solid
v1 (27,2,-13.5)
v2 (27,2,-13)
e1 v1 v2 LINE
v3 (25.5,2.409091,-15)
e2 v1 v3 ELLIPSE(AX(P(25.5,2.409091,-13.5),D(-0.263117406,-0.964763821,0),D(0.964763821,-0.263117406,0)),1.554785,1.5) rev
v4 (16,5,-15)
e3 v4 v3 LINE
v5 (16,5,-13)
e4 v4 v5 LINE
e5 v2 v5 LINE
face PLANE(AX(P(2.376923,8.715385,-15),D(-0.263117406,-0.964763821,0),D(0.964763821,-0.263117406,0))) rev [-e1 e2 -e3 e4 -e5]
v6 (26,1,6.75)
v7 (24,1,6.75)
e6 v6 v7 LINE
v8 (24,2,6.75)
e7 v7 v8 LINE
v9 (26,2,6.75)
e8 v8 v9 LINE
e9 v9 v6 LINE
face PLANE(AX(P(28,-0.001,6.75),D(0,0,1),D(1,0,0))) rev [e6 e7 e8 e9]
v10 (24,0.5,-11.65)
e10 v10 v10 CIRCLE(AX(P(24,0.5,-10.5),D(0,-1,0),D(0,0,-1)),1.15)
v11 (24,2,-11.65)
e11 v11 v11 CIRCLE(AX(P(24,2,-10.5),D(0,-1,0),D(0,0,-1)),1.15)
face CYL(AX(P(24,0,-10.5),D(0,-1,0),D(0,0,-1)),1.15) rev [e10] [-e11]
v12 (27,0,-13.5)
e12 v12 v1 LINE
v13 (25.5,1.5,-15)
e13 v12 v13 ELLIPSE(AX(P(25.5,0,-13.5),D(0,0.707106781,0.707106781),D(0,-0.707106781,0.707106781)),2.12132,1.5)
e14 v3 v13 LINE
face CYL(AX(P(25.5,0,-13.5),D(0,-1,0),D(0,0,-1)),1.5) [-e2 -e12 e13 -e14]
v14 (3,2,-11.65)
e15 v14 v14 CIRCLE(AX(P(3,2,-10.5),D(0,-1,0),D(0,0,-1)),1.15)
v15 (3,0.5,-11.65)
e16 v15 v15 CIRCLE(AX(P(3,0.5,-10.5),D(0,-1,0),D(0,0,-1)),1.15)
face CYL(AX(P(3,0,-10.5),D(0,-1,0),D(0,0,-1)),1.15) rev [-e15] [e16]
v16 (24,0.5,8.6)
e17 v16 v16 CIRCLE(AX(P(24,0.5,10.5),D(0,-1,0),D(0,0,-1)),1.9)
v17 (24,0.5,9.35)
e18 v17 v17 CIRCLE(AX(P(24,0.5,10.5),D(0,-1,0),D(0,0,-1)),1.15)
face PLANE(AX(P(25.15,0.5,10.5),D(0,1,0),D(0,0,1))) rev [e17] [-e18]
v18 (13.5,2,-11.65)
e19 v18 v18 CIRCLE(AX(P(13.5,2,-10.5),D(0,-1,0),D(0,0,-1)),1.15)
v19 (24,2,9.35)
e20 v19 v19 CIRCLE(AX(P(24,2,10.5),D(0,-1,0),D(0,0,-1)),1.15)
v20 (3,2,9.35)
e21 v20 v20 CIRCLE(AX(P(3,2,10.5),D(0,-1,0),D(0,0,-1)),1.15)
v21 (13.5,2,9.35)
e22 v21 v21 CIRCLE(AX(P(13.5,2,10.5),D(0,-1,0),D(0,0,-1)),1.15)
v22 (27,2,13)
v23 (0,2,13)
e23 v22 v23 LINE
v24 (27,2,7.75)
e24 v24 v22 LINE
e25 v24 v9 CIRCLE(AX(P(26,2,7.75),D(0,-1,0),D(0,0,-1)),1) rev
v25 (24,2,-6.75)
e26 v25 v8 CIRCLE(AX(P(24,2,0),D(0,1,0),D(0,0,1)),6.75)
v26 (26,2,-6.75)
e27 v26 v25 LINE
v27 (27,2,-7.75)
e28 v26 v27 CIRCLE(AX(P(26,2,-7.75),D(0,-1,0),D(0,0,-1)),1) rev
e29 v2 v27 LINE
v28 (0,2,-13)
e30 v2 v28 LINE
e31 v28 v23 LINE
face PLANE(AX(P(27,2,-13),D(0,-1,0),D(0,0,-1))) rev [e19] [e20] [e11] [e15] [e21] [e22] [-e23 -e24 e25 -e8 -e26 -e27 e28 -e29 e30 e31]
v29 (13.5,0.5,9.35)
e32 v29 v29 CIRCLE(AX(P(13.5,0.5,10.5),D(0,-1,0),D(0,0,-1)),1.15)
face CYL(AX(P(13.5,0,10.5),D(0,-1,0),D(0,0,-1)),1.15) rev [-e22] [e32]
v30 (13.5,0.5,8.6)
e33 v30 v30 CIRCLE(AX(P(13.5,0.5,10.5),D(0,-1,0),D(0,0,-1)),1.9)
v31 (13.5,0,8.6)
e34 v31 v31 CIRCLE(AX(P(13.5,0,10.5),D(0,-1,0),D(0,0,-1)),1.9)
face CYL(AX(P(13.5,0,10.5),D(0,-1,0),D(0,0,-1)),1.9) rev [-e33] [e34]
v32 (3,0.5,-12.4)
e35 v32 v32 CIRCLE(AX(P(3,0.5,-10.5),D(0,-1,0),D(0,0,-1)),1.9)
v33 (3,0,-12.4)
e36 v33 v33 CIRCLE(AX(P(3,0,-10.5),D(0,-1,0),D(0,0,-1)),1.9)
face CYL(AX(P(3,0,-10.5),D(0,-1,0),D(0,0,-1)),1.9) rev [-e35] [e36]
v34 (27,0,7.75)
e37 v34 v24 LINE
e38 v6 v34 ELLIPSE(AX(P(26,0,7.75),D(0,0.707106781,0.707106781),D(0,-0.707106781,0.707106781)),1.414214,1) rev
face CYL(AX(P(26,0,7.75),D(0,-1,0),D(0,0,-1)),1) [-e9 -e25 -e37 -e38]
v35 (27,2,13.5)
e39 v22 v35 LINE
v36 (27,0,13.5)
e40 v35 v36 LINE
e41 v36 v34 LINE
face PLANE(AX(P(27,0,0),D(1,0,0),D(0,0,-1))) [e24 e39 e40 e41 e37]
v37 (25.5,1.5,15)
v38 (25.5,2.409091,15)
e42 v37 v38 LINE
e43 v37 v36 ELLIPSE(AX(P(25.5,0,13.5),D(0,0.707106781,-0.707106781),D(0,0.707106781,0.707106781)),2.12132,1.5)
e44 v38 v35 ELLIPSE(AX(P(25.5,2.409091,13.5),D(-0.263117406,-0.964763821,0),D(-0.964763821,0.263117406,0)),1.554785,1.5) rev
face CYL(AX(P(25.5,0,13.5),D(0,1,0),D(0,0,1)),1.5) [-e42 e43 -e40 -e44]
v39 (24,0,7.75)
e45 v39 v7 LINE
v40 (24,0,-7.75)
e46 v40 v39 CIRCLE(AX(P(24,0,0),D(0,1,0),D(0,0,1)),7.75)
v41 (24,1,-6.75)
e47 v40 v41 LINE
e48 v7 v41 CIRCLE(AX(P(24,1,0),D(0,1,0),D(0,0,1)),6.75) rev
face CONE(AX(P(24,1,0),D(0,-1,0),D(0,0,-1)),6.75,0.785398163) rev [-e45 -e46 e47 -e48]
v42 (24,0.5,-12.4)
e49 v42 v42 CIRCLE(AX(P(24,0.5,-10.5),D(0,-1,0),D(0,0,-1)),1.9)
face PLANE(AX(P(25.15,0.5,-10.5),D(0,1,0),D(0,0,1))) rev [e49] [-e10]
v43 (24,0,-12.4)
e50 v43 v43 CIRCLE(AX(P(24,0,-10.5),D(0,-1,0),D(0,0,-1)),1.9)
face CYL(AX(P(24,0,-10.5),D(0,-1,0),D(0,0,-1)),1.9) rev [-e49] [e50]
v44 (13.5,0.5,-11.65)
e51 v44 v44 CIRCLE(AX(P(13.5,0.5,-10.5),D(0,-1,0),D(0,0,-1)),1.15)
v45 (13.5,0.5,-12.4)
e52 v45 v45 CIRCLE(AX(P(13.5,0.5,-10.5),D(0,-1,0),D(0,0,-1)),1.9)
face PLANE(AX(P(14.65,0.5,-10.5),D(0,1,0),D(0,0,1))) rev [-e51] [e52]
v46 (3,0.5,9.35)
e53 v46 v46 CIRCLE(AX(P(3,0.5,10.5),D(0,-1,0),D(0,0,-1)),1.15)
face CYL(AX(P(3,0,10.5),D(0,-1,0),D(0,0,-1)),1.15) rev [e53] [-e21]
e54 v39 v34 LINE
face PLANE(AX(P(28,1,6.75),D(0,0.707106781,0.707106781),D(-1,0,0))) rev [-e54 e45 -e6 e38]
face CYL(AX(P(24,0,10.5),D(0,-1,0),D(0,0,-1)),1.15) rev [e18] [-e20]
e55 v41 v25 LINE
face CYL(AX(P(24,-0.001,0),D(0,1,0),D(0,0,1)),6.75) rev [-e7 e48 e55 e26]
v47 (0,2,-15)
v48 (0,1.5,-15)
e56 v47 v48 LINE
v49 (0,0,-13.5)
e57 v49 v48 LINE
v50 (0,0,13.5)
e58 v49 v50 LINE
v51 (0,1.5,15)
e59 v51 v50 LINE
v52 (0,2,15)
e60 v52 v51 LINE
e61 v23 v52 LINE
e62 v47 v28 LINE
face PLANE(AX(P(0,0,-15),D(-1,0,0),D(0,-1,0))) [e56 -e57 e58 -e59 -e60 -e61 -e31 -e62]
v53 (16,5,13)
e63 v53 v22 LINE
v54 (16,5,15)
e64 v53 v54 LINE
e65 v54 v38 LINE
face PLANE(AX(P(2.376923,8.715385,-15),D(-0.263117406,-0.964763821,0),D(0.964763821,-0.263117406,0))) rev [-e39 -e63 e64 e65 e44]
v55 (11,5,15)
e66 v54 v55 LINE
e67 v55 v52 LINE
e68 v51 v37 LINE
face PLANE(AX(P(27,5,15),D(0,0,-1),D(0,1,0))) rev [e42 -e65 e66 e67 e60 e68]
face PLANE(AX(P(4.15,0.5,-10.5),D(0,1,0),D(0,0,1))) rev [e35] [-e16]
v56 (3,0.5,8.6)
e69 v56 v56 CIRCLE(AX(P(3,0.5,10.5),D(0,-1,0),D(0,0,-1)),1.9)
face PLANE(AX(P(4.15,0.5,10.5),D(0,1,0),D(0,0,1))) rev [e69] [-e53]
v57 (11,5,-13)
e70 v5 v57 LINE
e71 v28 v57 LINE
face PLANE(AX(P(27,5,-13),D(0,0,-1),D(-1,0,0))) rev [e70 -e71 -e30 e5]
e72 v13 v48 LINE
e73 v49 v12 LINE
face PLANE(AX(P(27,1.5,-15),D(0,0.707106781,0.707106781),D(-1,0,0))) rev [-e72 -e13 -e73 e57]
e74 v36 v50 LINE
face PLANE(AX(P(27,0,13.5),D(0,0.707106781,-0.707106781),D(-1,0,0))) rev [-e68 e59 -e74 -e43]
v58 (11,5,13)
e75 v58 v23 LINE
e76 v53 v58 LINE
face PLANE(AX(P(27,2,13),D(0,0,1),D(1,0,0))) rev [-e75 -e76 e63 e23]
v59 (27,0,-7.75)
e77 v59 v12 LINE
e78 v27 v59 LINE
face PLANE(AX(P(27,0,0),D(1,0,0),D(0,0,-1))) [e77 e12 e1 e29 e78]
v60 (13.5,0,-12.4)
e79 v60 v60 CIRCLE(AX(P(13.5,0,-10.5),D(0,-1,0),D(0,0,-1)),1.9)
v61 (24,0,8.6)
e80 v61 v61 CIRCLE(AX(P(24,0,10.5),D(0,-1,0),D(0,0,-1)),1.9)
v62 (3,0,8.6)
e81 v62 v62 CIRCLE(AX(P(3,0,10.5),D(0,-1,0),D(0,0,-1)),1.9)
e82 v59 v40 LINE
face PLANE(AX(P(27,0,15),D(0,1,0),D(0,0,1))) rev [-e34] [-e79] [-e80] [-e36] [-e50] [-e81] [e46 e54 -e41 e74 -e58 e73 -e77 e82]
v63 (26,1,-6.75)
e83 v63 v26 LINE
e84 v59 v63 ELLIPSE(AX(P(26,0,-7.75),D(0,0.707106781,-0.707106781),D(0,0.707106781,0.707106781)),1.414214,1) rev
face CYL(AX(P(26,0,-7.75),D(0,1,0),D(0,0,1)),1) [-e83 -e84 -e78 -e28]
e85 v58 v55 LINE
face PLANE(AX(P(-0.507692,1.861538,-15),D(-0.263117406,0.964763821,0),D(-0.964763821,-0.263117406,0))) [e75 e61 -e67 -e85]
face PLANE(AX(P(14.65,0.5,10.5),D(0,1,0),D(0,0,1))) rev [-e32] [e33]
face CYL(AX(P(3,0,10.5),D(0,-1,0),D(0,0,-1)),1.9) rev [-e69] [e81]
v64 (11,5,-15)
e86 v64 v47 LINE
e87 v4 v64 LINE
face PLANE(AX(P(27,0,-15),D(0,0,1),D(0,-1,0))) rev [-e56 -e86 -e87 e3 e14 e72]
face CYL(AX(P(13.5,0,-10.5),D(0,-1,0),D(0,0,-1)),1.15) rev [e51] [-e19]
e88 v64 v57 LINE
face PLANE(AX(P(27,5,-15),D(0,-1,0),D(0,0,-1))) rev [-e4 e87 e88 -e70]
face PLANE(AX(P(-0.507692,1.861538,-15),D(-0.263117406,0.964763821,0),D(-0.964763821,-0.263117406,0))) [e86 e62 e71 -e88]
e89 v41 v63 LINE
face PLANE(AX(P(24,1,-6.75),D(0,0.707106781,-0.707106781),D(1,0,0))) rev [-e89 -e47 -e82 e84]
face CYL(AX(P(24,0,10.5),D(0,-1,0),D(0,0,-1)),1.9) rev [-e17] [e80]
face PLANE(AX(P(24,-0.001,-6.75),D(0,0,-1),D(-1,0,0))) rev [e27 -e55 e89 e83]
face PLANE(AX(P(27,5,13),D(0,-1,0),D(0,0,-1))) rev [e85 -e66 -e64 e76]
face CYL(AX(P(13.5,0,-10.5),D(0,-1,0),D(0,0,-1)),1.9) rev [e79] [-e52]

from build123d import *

# Parameters (mm, degrees)
EXTRUDE_1_DEPTH              = 27
CUT_EXTRUDE_1_REACH          = 33.032
HOLE_WIZARD_M2_1_D           = 2.3
HOLE_WIZARD_M2_1_CBORE_D     = 3.8
HOLE_WIZARD_M2_1_CBORE_DEPTH = 0.5
PATTERN_LINEAR_1_COUNT       = 3
PATTERN_LINEAR_1_PITCH       = 10.5
MIRROR_1_COPY_1_D            = 2.3
MIRROR_1_COPY_1_CBORE_D      = 3.8
MIRROR_1_COPY_1_CBORE_DEPTH  = 0.5
MIRROR_1_COPY_2_D            = 2.3
MIRROR_1_COPY_2_CBORE_D      = 3.8
MIRROR_1_COPY_2_CBORE_DEPTH  = 0.5
CHAMFER_1_SIZE               = 1
MIRROR_3_COPY_1_D            = 2.3
MIRROR_3_COPY_1_CBORE_D      = 3.8
MIRROR_3_COPY_1_CBORE_DEPTH  = 0.5
MIRROR_3_COPY_2_D            = 2.3
MIRROR_3_COPY_2_CBORE_D      = 3.8
MIRROR_3_COPY_2_CBORE_DEPTH  = 0.5
MIRROR_3_COPY_3_D            = 2.3
MIRROR_3_COPY_3_CBORE_D      = 3.8
MIRROR_3_COPY_3_CBORE_DEPTH  = 0.5
MIRROR_3_COPY_4_D            = 2.3
MIRROR_3_COPY_4_CBORE_D      = 3.8
MIRROR_3_COPY_4_CBORE_DEPTH  = 0.5
MIRROR_3_COPY_5_D            = 2.3
MIRROR_3_COPY_5_CBORE_D      = 3.8
MIRROR_3_COPY_5_CBORE_DEPTH  = 0.5
CHAMFER_1_OF_MIRROR_3_SIZE   = 1
FILLET_1_R                   = 1.5
FILLET_2_R                   = 1
CHAMFER_2_SIZE               = 1.5
CUT_EXTRUDE_2_DEPTH          = 41.669398815


with BuildPart() as part:
    # ｽｹｯﾁ1 → ﾎﾞｽ - 押し出し1 (new, symmetric)
    with BuildSketch(Plane(origin=(0, 0, 0), x_dir=(0, 0, -1), z_dir=(1, 0, 0))):
        Polygon((-15, 0), (15, 0), (15, 5), (13, 5), (13, 2), (-13, 2), (-13, 5), (-15, 5), align=None)
    extrude(amount=EXTRUDE_1_DEPTH, both=True)

    # ｽｹｯﾁ2 → ｶｯﾄ - 押し出し1 (cut, up to next)
    with BuildSketch(Plane(origin=(0, 2, 0), x_dir=(1, 0, 0), z_dir=(0, 1, 0)), mode=Mode.PRIVATE) as cut_extrude_1_sk1:
        with BuildLine():
            Line((24, 6.75), (28, 6.75))
            Line((28, 6.75), (28, -6.75))
            Line((28, -6.75), (24, -6.75))
            ThreePointArc((24, -6.75), (17.25, 0), (24, 6.75))
        make_face()
    cut_extrude_1_tool1 = extrude(cut_extrude_1_sk1.sketch, amount=-CUT_EXTRUDE_1_REACH, mode=Mode.PRIVATE) & part.part
    cut_extrude_1 = cut_extrude_1_tool1.solids().sort_by_distance((23.22727, 2, 0))[0]
    add(cut_extrude_1, mode=Mode.SUBTRACT)

    # M2 丸平ねじ用座ぐり穴1 (through all)
    with Locations(Plane(origin=(0, 0, 0), x_dir=(-1, 0, 0), z_dir=(0, -1, 0))):
        with Locations((-24, -10.5)):
            hole_wizard_m2_1 = CounterBoreHole(HOLE_WIZARD_M2_1_D / 2, HOLE_WIZARD_M2_1_CBORE_D / 2, HOLE_WIZARD_M2_1_CBORE_DEPTH)

    # 直線ﾊﾟﾀｰﾝ1: M2 丸平ねじ用座ぐり穴1 ×3
    with Locations(*[(-i * PATTERN_LINEAR_1_PITCH, 0, 0) for i in range(1, PATTERN_LINEAR_1_COUNT)]):
        add(hole_wizard_m2_1, mode=Mode.SUBTRACT)

    # ﾐﾗｰ1: M2 丸平ねじ用座ぐり穴1 across plane
    add(hole_wizard_m2_1.mirror(Plane.XY), mode=Mode.SUBTRACT)

    # ﾐﾗｰ1 copy 1 (through all)
    with Locations(Plane(origin=(-10.5, 0, 0), x_dir=(-1, 0, 0), z_dir=(0, -1, 0))):
        with Locations((-24, 10.5)):
            CounterBoreHole(MIRROR_1_COPY_1_D / 2, MIRROR_1_COPY_1_CBORE_D / 2, MIRROR_1_COPY_1_CBORE_DEPTH)

    # ﾐﾗｰ1 copy 2 (through all)
    with Locations(Plane(origin=(-21, 0, 0), x_dir=(-1, 0, 0), z_dir=(0, -1, 0))):
        with Locations((-24, 10.5)):
            CounterBoreHole(MIRROR_1_COPY_2_D / 2, MIRROR_1_COPY_2_CBORE_D / 2, MIRROR_1_COPY_2_CBORE_DEPTH)

    # 面取り1
    chamfer_1_edges = [part.edges().sort_by_distance(p)[0] for p in [
        (25.5, 0, 6.75),
        (17.25, 0, 0),
        (25.5, 0, -6.75),
    ]]
    chamfer(chamfer_1_edges, length=CHAMFER_1_SIZE)

    # ﾐﾗｰ3: ｶｯﾄ - 押し出し1, M2 丸平ねじ用座ぐり穴1 across plane
    add(cut_extrude_1.mirror(Plane(origin=(0, 0, 0), x_dir=(0, 0, 1), z_dir=(1, 0, 0))), mode=Mode.SUBTRACT)
    add(hole_wizard_m2_1.mirror(Plane(origin=(0, 0, 0), x_dir=(0, 0, 1), z_dir=(1, 0, 0))), mode=Mode.SUBTRACT)

    # ﾐﾗｰ3 copy 1 (through all)
    with Locations(Plane(origin=(10.5, 0, 0), x_dir=(1, 0, 0), z_dir=(0, -1, 0))):
        with Locations((-24, 10.5)):
            CounterBoreHole(MIRROR_3_COPY_1_D / 2, MIRROR_3_COPY_1_CBORE_D / 2, MIRROR_3_COPY_1_CBORE_DEPTH)

    # ﾐﾗｰ3 copy 2 (through all)
    with Locations(Plane(origin=(21, 0, 0), x_dir=(1, 0, 0), z_dir=(0, -1, 0))):
        with Locations((-24, 10.5)):
            CounterBoreHole(MIRROR_3_COPY_2_D / 2, MIRROR_3_COPY_2_CBORE_D / 2, MIRROR_3_COPY_2_CBORE_DEPTH)

    # ﾐﾗｰ3 copy 3 (through all)
    with Locations(Plane.XZ):
        with Locations((-24, -10.5)):
            CounterBoreHole(MIRROR_3_COPY_3_D / 2, MIRROR_3_COPY_3_CBORE_D / 2, MIRROR_3_COPY_3_CBORE_DEPTH)

    # ﾐﾗｰ3 copy 4 (through all)
    with Locations(Plane(origin=(10.5, 0, 0), x_dir=(1, 0, 0), z_dir=(0, -1, 0))):
        with Locations((-24, -10.5)):
            CounterBoreHole(MIRROR_3_COPY_4_D / 2, MIRROR_3_COPY_4_CBORE_D / 2, MIRROR_3_COPY_4_CBORE_DEPTH)

    # ﾐﾗｰ3 copy 5 (through all)
    with Locations(Plane(origin=(21, 0, 0), x_dir=(1, 0, 0), z_dir=(0, -1, 0))):
        with Locations((-24, -10.5)):
            CounterBoreHole(MIRROR_3_COPY_5_D / 2, MIRROR_3_COPY_5_CBORE_D / 2, MIRROR_3_COPY_5_CBORE_DEPTH)

    # 面取り1 of ﾐﾗｰ3
    chamfer_1_of_mirror_3_edges = [part.edges().sort_by_distance(p)[0] for p in [
        (-25.5, 0, 6.75),
        (-17.25, 0, 0),
        (-25.5, 0, -6.75),
    ]]
    chamfer(chamfer_1_of_mirror_3_edges, length=CHAMFER_1_OF_MIRROR_3_SIZE)

    # ﾌｨﾚｯﾄ1
    fillet_1_edges = [part.edges().sort_by_distance(p)[0] for p in [
        (27, 2.5, -15),
        (-27, 2.5, 15),
        (27, 2.5, 15),
        (-27, 2.5, -15),
    ]]
    fillet(fillet_1_edges, radius=FILLET_1_R)

    # ﾌｨﾚｯﾄ2
    fillet_2_edges = [part.edges().sort_by_distance(p)[0] for p in [
        (27, 1.5, -6.75),
        (27, 1.5, 6.75),
        (-27, 1.5, -6.75),
        (-27, 1.5, 6.75),
    ]]
    fillet(fillet_2_edges, radius=FILLET_2_R)

    # 面取り2
    # the kernel refuses this chamfer: 1.5 mm, written as the material it takes off along each edge
    with BuildSketch(Plane(origin=(-29.357524482, 0, -15), x_dir=(0, -0.02749587661058654, 0.9996219169112965), z_dir=(1, 0, 0)), Plane(origin=(29.357524482, 0, 15), x_dir=(0, -0.027495876610586178, -0.9996219169112968), z_dir=(-1, 0, 0))) as chamfer_2_piece_1:
        Polygon((CHAMFER_2_SIZE * 0.999621916911, -CHAMFER_2_SIZE * 0.0274958766106), (-CHAMFER_2_SIZE * 0.0274958766106, -CHAMFER_2_SIZE * 0.999621916911), (0, 0), align=None)
    extrude(amount=58.715048964, mode=Mode.SUBTRACT)

    # ｽｹｯﾁ6 → ｶｯﾄ - 押し出し2 (cut, through all)
    with BuildSketch(Plane.XY.offset(15)):
        Polygon((27, 5), (16, 5), (27, 2), align=None)
        Polygon((11, 5), (-27, 5), (-27, 0), (0, 0), (0, 2), align=None)
    extrude(amount=-CUT_EXTRUDE_2_DEPTH, mode=Mode.SUBTRACT)


solid = part.part
